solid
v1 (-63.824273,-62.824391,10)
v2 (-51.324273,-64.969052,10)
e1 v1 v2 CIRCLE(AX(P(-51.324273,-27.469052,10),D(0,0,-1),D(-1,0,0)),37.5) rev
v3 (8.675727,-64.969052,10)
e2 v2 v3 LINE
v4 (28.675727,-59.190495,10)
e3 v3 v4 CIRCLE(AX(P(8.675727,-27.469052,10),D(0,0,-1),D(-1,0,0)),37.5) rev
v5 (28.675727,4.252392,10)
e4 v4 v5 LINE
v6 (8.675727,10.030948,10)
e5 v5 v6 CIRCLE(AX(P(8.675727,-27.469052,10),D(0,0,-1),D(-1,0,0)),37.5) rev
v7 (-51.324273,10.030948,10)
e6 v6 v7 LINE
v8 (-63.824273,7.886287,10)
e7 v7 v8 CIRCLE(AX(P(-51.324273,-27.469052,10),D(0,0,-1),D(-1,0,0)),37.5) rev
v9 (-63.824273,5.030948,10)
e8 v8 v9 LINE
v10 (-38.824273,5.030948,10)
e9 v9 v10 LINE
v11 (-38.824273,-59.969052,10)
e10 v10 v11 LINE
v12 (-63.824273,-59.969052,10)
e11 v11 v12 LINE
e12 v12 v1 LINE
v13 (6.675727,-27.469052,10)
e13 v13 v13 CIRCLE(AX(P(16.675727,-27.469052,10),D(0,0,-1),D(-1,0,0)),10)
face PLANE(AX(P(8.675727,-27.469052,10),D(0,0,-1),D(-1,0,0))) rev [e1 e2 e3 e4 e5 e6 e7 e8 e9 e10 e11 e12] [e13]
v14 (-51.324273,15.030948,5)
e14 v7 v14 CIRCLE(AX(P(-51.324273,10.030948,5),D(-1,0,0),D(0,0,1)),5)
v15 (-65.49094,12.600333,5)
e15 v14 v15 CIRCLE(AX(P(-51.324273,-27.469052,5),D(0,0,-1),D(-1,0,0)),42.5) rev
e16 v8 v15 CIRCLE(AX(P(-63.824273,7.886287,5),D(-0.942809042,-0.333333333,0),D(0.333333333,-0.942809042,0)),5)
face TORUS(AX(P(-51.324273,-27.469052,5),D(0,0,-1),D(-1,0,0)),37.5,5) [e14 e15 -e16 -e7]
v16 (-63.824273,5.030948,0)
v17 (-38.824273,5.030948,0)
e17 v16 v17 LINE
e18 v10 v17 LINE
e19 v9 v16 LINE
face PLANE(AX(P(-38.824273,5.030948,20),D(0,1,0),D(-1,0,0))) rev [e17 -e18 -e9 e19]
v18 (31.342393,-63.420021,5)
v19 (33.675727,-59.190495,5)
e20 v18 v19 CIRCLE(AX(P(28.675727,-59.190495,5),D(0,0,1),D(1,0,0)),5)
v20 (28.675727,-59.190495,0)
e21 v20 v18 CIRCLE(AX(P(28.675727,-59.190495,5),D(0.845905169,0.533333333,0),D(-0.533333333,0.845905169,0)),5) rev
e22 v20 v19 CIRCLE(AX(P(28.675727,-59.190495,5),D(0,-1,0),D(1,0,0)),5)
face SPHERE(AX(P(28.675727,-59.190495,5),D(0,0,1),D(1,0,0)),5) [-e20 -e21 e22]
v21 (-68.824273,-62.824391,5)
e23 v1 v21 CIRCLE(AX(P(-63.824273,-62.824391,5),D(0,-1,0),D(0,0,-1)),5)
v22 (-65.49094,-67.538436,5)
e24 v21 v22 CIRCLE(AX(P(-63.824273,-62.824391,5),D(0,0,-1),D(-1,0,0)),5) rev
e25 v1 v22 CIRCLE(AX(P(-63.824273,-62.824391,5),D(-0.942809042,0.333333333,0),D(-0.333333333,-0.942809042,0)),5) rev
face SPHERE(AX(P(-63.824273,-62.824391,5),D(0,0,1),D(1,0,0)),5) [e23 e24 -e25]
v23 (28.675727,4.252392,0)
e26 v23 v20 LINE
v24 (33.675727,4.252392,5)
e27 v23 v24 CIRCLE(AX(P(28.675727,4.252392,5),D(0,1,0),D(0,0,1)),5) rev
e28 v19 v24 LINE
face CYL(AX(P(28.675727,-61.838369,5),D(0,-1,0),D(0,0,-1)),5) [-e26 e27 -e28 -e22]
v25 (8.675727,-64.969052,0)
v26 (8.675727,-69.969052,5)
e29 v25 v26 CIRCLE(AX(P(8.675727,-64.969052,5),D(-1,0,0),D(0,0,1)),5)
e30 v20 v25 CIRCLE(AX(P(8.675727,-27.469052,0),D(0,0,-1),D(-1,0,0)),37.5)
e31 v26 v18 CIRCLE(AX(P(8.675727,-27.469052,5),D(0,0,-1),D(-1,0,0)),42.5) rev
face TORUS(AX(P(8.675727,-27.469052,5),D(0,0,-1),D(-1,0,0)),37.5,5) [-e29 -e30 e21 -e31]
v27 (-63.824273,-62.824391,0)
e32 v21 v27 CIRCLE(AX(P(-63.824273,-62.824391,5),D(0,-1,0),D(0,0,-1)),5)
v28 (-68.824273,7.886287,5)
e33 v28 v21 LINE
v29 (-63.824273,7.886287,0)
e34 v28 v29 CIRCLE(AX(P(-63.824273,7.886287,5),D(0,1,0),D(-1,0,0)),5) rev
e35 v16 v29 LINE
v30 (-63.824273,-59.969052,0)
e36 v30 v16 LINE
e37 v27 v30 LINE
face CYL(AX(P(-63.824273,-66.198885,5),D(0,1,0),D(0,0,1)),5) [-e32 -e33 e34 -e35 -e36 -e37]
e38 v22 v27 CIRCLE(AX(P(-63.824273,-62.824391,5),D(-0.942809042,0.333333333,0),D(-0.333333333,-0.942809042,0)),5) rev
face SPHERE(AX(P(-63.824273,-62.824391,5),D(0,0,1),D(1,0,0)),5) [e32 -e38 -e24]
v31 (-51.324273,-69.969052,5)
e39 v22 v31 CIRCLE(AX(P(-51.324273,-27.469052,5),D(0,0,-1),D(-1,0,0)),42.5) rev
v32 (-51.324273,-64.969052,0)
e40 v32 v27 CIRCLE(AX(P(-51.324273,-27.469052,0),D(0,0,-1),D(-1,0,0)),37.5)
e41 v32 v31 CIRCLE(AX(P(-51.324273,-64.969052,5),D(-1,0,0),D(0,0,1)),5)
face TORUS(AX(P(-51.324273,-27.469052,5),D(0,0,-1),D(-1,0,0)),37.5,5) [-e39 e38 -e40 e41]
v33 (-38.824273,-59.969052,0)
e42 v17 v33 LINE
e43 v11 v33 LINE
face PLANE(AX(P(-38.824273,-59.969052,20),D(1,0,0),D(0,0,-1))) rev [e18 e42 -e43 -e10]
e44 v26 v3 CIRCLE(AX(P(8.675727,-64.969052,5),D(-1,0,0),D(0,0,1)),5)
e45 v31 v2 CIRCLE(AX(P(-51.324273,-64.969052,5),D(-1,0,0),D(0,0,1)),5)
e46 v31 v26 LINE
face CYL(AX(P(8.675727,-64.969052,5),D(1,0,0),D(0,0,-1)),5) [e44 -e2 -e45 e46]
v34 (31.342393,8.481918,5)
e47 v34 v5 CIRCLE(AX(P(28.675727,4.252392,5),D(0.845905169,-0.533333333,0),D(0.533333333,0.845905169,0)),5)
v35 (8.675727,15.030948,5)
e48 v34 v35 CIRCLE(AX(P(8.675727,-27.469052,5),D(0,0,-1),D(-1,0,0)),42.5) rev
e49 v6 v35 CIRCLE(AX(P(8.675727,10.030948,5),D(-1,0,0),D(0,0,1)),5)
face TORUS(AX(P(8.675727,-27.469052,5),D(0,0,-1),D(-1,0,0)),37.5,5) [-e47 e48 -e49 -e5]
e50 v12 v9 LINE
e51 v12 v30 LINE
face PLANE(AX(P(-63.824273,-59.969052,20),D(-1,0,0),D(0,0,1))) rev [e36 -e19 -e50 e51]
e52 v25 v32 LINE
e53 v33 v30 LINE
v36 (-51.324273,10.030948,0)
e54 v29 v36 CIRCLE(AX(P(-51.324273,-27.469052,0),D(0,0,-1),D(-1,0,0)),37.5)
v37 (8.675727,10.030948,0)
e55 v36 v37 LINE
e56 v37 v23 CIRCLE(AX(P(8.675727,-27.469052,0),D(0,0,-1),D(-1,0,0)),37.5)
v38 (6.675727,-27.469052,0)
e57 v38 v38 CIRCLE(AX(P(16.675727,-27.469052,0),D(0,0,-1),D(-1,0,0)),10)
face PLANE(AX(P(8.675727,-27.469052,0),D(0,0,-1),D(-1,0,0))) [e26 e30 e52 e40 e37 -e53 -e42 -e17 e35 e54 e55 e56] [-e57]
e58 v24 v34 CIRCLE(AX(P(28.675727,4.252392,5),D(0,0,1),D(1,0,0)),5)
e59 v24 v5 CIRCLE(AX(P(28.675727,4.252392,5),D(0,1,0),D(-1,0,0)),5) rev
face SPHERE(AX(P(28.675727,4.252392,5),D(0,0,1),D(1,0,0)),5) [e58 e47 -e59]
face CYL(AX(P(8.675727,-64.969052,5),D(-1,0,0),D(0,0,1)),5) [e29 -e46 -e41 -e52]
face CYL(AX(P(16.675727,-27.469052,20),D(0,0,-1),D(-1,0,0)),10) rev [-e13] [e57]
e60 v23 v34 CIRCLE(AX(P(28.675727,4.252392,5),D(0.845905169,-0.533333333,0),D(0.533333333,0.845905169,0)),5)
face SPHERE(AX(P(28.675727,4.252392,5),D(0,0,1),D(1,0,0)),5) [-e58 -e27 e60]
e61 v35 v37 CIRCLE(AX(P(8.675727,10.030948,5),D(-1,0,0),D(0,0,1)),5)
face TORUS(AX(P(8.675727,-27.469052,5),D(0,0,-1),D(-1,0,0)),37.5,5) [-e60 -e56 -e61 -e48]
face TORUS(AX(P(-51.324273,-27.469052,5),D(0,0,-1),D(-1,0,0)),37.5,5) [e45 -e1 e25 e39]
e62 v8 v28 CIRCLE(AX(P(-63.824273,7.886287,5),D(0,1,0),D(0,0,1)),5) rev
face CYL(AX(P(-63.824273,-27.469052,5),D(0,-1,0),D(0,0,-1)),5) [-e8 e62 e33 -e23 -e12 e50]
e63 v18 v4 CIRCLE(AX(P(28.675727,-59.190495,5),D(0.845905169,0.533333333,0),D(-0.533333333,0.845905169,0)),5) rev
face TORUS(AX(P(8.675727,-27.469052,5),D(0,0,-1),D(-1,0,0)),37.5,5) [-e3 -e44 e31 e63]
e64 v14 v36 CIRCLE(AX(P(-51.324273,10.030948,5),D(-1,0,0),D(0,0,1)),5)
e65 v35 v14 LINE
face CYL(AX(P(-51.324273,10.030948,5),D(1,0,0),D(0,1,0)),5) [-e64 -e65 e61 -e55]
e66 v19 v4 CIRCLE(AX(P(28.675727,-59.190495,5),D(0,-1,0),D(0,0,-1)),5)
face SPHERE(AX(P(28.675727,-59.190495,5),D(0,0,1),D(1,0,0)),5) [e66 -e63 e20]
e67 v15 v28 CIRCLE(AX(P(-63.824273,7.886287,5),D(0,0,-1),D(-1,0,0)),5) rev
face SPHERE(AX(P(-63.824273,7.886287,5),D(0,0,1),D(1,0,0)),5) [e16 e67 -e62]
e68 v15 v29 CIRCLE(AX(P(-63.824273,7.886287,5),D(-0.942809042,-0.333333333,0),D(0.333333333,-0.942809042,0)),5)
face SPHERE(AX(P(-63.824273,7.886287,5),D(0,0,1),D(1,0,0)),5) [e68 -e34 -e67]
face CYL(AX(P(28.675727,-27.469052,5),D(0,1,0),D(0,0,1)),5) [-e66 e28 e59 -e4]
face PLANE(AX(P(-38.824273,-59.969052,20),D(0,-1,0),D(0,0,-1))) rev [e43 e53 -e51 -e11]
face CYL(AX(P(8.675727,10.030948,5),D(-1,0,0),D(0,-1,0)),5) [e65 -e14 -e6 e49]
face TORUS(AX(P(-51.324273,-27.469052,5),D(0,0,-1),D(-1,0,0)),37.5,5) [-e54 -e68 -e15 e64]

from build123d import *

# Parameters (mm, degrees)
BOSS_EXTRUDE1_DEPTH = 10
SKETCH2_W           = 25
SKETCH2_H           = 65
CUT_EXTRUDE2_DEPTH  = 20
SKETCH3_R           = 10
CUT_EXTRUDE3_DEPTH  = 20
FILLET2_R           = 5


with BuildPart() as part:
    # Sketch1 → Boss-Extrude1 (new body)
    with BuildSketch(Plane.XY):
        with BuildLine():
            Line((-51.324273213, 15.030948404), (8.675726787, 15.030948404))
            ThreePointArc((8.675726787, 15.030948404), (21.820193251, 12.947195155), (33.675726787, 6.900266117))
            Line((33.675726787, 6.900266117), (33.675726787, -61.838369308))
            ThreePointArc((33.675726787, -61.838369308), (21.820193251, -67.885298346), (8.675726787, -69.969051596))
            Line((8.675726787, -69.969051596), (-51.324273213, -69.969051596))
            ThreePointArc((-51.324273213, -69.969051596), (-60.275029546, -69.015819954), (-68.824273213, -66.198885058))
            Line((-68.824273213, -66.198885058), (-68.824273213, 11.260781867))
            ThreePointArc((-68.824273213, 11.260781867), (-60.275029546, 14.077716763), (-51.324273213, 15.030948404))
        make_face()
    extrude(amount=BOSS_EXTRUDE1_DEPTH)

    # Sketch2 → Cut-Extrude2 (cut)
    with BuildSketch(Plane(origin=(0, 0, 0), x_dir=(-1, 0, 0), z_dir=(0, 0, -1))):
        with Locations((51.324273213, -27.469051596)):
            Rectangle(SKETCH2_W, SKETCH2_H)
    extrude(amount=-CUT_EXTRUDE2_DEPTH, mode=Mode.SUBTRACT)

    # Sketch3 → Cut-Extrude3 (cut)
    with BuildSketch(Plane(origin=(0, 0, 0), x_dir=(-1, 0, 0), z_dir=(0, 0, -1))):
        with Locations((-16.675726787, -27.469051596)):
            Circle(SKETCH3_R)
    extrude(amount=-CUT_EXTRUDE3_DEPTH, mode=Mode.SUBTRACT)

    # Fillet2
    fillet2_edges = [part.edges().sort_by_distance(p)[0] for p in [
        (21.820193251, 12.947195155, 10),
        (33.675726787, -27.469051596, 0),
        (21.820193251, -67.885298346, 0),
        (-21.324273213, 15.030948404, 10),
        (8.675726787, -69.969051596, 5),
        (-51.324273213, -69.969051596, 5),
        (-68.824273213, -66.198885058, 5),
        (-68.824273213, 11.260781867, 5),
        (-51.324273213, 15.030948404, 5),
        (8.675726787, 15.030948404, 5),
        (33.675726787, 6.900266117, 5),
        (33.675726787, -61.838369308, 5),
        (-60.275029546, 14.077716763, 10),
        (-68.824273213, -27.469051596, 10),
        (-60.275029546, -69.015819954, 10),
        (-21.324273213, -69.969051596, 10),
        (21.820193251, -67.885298346, 10),
        (33.675726787, -27.469051596, 10),
        (-21.324273213, -69.969051596, 0),
        (-60.275029546, -69.015819954, 0),
        (-68.824273213, -27.469051596, 0),
        (-60.275029546, 14.077716763, 0),
        (-21.324273213, 15.030948404, 0),
        (21.820193251, 12.947195155, 0),
    ]]
    fillet(fillet2_edges, radius=FILLET2_R - 0.0001)  # a hair under: the kernel refuses the full size


solid = part.part
